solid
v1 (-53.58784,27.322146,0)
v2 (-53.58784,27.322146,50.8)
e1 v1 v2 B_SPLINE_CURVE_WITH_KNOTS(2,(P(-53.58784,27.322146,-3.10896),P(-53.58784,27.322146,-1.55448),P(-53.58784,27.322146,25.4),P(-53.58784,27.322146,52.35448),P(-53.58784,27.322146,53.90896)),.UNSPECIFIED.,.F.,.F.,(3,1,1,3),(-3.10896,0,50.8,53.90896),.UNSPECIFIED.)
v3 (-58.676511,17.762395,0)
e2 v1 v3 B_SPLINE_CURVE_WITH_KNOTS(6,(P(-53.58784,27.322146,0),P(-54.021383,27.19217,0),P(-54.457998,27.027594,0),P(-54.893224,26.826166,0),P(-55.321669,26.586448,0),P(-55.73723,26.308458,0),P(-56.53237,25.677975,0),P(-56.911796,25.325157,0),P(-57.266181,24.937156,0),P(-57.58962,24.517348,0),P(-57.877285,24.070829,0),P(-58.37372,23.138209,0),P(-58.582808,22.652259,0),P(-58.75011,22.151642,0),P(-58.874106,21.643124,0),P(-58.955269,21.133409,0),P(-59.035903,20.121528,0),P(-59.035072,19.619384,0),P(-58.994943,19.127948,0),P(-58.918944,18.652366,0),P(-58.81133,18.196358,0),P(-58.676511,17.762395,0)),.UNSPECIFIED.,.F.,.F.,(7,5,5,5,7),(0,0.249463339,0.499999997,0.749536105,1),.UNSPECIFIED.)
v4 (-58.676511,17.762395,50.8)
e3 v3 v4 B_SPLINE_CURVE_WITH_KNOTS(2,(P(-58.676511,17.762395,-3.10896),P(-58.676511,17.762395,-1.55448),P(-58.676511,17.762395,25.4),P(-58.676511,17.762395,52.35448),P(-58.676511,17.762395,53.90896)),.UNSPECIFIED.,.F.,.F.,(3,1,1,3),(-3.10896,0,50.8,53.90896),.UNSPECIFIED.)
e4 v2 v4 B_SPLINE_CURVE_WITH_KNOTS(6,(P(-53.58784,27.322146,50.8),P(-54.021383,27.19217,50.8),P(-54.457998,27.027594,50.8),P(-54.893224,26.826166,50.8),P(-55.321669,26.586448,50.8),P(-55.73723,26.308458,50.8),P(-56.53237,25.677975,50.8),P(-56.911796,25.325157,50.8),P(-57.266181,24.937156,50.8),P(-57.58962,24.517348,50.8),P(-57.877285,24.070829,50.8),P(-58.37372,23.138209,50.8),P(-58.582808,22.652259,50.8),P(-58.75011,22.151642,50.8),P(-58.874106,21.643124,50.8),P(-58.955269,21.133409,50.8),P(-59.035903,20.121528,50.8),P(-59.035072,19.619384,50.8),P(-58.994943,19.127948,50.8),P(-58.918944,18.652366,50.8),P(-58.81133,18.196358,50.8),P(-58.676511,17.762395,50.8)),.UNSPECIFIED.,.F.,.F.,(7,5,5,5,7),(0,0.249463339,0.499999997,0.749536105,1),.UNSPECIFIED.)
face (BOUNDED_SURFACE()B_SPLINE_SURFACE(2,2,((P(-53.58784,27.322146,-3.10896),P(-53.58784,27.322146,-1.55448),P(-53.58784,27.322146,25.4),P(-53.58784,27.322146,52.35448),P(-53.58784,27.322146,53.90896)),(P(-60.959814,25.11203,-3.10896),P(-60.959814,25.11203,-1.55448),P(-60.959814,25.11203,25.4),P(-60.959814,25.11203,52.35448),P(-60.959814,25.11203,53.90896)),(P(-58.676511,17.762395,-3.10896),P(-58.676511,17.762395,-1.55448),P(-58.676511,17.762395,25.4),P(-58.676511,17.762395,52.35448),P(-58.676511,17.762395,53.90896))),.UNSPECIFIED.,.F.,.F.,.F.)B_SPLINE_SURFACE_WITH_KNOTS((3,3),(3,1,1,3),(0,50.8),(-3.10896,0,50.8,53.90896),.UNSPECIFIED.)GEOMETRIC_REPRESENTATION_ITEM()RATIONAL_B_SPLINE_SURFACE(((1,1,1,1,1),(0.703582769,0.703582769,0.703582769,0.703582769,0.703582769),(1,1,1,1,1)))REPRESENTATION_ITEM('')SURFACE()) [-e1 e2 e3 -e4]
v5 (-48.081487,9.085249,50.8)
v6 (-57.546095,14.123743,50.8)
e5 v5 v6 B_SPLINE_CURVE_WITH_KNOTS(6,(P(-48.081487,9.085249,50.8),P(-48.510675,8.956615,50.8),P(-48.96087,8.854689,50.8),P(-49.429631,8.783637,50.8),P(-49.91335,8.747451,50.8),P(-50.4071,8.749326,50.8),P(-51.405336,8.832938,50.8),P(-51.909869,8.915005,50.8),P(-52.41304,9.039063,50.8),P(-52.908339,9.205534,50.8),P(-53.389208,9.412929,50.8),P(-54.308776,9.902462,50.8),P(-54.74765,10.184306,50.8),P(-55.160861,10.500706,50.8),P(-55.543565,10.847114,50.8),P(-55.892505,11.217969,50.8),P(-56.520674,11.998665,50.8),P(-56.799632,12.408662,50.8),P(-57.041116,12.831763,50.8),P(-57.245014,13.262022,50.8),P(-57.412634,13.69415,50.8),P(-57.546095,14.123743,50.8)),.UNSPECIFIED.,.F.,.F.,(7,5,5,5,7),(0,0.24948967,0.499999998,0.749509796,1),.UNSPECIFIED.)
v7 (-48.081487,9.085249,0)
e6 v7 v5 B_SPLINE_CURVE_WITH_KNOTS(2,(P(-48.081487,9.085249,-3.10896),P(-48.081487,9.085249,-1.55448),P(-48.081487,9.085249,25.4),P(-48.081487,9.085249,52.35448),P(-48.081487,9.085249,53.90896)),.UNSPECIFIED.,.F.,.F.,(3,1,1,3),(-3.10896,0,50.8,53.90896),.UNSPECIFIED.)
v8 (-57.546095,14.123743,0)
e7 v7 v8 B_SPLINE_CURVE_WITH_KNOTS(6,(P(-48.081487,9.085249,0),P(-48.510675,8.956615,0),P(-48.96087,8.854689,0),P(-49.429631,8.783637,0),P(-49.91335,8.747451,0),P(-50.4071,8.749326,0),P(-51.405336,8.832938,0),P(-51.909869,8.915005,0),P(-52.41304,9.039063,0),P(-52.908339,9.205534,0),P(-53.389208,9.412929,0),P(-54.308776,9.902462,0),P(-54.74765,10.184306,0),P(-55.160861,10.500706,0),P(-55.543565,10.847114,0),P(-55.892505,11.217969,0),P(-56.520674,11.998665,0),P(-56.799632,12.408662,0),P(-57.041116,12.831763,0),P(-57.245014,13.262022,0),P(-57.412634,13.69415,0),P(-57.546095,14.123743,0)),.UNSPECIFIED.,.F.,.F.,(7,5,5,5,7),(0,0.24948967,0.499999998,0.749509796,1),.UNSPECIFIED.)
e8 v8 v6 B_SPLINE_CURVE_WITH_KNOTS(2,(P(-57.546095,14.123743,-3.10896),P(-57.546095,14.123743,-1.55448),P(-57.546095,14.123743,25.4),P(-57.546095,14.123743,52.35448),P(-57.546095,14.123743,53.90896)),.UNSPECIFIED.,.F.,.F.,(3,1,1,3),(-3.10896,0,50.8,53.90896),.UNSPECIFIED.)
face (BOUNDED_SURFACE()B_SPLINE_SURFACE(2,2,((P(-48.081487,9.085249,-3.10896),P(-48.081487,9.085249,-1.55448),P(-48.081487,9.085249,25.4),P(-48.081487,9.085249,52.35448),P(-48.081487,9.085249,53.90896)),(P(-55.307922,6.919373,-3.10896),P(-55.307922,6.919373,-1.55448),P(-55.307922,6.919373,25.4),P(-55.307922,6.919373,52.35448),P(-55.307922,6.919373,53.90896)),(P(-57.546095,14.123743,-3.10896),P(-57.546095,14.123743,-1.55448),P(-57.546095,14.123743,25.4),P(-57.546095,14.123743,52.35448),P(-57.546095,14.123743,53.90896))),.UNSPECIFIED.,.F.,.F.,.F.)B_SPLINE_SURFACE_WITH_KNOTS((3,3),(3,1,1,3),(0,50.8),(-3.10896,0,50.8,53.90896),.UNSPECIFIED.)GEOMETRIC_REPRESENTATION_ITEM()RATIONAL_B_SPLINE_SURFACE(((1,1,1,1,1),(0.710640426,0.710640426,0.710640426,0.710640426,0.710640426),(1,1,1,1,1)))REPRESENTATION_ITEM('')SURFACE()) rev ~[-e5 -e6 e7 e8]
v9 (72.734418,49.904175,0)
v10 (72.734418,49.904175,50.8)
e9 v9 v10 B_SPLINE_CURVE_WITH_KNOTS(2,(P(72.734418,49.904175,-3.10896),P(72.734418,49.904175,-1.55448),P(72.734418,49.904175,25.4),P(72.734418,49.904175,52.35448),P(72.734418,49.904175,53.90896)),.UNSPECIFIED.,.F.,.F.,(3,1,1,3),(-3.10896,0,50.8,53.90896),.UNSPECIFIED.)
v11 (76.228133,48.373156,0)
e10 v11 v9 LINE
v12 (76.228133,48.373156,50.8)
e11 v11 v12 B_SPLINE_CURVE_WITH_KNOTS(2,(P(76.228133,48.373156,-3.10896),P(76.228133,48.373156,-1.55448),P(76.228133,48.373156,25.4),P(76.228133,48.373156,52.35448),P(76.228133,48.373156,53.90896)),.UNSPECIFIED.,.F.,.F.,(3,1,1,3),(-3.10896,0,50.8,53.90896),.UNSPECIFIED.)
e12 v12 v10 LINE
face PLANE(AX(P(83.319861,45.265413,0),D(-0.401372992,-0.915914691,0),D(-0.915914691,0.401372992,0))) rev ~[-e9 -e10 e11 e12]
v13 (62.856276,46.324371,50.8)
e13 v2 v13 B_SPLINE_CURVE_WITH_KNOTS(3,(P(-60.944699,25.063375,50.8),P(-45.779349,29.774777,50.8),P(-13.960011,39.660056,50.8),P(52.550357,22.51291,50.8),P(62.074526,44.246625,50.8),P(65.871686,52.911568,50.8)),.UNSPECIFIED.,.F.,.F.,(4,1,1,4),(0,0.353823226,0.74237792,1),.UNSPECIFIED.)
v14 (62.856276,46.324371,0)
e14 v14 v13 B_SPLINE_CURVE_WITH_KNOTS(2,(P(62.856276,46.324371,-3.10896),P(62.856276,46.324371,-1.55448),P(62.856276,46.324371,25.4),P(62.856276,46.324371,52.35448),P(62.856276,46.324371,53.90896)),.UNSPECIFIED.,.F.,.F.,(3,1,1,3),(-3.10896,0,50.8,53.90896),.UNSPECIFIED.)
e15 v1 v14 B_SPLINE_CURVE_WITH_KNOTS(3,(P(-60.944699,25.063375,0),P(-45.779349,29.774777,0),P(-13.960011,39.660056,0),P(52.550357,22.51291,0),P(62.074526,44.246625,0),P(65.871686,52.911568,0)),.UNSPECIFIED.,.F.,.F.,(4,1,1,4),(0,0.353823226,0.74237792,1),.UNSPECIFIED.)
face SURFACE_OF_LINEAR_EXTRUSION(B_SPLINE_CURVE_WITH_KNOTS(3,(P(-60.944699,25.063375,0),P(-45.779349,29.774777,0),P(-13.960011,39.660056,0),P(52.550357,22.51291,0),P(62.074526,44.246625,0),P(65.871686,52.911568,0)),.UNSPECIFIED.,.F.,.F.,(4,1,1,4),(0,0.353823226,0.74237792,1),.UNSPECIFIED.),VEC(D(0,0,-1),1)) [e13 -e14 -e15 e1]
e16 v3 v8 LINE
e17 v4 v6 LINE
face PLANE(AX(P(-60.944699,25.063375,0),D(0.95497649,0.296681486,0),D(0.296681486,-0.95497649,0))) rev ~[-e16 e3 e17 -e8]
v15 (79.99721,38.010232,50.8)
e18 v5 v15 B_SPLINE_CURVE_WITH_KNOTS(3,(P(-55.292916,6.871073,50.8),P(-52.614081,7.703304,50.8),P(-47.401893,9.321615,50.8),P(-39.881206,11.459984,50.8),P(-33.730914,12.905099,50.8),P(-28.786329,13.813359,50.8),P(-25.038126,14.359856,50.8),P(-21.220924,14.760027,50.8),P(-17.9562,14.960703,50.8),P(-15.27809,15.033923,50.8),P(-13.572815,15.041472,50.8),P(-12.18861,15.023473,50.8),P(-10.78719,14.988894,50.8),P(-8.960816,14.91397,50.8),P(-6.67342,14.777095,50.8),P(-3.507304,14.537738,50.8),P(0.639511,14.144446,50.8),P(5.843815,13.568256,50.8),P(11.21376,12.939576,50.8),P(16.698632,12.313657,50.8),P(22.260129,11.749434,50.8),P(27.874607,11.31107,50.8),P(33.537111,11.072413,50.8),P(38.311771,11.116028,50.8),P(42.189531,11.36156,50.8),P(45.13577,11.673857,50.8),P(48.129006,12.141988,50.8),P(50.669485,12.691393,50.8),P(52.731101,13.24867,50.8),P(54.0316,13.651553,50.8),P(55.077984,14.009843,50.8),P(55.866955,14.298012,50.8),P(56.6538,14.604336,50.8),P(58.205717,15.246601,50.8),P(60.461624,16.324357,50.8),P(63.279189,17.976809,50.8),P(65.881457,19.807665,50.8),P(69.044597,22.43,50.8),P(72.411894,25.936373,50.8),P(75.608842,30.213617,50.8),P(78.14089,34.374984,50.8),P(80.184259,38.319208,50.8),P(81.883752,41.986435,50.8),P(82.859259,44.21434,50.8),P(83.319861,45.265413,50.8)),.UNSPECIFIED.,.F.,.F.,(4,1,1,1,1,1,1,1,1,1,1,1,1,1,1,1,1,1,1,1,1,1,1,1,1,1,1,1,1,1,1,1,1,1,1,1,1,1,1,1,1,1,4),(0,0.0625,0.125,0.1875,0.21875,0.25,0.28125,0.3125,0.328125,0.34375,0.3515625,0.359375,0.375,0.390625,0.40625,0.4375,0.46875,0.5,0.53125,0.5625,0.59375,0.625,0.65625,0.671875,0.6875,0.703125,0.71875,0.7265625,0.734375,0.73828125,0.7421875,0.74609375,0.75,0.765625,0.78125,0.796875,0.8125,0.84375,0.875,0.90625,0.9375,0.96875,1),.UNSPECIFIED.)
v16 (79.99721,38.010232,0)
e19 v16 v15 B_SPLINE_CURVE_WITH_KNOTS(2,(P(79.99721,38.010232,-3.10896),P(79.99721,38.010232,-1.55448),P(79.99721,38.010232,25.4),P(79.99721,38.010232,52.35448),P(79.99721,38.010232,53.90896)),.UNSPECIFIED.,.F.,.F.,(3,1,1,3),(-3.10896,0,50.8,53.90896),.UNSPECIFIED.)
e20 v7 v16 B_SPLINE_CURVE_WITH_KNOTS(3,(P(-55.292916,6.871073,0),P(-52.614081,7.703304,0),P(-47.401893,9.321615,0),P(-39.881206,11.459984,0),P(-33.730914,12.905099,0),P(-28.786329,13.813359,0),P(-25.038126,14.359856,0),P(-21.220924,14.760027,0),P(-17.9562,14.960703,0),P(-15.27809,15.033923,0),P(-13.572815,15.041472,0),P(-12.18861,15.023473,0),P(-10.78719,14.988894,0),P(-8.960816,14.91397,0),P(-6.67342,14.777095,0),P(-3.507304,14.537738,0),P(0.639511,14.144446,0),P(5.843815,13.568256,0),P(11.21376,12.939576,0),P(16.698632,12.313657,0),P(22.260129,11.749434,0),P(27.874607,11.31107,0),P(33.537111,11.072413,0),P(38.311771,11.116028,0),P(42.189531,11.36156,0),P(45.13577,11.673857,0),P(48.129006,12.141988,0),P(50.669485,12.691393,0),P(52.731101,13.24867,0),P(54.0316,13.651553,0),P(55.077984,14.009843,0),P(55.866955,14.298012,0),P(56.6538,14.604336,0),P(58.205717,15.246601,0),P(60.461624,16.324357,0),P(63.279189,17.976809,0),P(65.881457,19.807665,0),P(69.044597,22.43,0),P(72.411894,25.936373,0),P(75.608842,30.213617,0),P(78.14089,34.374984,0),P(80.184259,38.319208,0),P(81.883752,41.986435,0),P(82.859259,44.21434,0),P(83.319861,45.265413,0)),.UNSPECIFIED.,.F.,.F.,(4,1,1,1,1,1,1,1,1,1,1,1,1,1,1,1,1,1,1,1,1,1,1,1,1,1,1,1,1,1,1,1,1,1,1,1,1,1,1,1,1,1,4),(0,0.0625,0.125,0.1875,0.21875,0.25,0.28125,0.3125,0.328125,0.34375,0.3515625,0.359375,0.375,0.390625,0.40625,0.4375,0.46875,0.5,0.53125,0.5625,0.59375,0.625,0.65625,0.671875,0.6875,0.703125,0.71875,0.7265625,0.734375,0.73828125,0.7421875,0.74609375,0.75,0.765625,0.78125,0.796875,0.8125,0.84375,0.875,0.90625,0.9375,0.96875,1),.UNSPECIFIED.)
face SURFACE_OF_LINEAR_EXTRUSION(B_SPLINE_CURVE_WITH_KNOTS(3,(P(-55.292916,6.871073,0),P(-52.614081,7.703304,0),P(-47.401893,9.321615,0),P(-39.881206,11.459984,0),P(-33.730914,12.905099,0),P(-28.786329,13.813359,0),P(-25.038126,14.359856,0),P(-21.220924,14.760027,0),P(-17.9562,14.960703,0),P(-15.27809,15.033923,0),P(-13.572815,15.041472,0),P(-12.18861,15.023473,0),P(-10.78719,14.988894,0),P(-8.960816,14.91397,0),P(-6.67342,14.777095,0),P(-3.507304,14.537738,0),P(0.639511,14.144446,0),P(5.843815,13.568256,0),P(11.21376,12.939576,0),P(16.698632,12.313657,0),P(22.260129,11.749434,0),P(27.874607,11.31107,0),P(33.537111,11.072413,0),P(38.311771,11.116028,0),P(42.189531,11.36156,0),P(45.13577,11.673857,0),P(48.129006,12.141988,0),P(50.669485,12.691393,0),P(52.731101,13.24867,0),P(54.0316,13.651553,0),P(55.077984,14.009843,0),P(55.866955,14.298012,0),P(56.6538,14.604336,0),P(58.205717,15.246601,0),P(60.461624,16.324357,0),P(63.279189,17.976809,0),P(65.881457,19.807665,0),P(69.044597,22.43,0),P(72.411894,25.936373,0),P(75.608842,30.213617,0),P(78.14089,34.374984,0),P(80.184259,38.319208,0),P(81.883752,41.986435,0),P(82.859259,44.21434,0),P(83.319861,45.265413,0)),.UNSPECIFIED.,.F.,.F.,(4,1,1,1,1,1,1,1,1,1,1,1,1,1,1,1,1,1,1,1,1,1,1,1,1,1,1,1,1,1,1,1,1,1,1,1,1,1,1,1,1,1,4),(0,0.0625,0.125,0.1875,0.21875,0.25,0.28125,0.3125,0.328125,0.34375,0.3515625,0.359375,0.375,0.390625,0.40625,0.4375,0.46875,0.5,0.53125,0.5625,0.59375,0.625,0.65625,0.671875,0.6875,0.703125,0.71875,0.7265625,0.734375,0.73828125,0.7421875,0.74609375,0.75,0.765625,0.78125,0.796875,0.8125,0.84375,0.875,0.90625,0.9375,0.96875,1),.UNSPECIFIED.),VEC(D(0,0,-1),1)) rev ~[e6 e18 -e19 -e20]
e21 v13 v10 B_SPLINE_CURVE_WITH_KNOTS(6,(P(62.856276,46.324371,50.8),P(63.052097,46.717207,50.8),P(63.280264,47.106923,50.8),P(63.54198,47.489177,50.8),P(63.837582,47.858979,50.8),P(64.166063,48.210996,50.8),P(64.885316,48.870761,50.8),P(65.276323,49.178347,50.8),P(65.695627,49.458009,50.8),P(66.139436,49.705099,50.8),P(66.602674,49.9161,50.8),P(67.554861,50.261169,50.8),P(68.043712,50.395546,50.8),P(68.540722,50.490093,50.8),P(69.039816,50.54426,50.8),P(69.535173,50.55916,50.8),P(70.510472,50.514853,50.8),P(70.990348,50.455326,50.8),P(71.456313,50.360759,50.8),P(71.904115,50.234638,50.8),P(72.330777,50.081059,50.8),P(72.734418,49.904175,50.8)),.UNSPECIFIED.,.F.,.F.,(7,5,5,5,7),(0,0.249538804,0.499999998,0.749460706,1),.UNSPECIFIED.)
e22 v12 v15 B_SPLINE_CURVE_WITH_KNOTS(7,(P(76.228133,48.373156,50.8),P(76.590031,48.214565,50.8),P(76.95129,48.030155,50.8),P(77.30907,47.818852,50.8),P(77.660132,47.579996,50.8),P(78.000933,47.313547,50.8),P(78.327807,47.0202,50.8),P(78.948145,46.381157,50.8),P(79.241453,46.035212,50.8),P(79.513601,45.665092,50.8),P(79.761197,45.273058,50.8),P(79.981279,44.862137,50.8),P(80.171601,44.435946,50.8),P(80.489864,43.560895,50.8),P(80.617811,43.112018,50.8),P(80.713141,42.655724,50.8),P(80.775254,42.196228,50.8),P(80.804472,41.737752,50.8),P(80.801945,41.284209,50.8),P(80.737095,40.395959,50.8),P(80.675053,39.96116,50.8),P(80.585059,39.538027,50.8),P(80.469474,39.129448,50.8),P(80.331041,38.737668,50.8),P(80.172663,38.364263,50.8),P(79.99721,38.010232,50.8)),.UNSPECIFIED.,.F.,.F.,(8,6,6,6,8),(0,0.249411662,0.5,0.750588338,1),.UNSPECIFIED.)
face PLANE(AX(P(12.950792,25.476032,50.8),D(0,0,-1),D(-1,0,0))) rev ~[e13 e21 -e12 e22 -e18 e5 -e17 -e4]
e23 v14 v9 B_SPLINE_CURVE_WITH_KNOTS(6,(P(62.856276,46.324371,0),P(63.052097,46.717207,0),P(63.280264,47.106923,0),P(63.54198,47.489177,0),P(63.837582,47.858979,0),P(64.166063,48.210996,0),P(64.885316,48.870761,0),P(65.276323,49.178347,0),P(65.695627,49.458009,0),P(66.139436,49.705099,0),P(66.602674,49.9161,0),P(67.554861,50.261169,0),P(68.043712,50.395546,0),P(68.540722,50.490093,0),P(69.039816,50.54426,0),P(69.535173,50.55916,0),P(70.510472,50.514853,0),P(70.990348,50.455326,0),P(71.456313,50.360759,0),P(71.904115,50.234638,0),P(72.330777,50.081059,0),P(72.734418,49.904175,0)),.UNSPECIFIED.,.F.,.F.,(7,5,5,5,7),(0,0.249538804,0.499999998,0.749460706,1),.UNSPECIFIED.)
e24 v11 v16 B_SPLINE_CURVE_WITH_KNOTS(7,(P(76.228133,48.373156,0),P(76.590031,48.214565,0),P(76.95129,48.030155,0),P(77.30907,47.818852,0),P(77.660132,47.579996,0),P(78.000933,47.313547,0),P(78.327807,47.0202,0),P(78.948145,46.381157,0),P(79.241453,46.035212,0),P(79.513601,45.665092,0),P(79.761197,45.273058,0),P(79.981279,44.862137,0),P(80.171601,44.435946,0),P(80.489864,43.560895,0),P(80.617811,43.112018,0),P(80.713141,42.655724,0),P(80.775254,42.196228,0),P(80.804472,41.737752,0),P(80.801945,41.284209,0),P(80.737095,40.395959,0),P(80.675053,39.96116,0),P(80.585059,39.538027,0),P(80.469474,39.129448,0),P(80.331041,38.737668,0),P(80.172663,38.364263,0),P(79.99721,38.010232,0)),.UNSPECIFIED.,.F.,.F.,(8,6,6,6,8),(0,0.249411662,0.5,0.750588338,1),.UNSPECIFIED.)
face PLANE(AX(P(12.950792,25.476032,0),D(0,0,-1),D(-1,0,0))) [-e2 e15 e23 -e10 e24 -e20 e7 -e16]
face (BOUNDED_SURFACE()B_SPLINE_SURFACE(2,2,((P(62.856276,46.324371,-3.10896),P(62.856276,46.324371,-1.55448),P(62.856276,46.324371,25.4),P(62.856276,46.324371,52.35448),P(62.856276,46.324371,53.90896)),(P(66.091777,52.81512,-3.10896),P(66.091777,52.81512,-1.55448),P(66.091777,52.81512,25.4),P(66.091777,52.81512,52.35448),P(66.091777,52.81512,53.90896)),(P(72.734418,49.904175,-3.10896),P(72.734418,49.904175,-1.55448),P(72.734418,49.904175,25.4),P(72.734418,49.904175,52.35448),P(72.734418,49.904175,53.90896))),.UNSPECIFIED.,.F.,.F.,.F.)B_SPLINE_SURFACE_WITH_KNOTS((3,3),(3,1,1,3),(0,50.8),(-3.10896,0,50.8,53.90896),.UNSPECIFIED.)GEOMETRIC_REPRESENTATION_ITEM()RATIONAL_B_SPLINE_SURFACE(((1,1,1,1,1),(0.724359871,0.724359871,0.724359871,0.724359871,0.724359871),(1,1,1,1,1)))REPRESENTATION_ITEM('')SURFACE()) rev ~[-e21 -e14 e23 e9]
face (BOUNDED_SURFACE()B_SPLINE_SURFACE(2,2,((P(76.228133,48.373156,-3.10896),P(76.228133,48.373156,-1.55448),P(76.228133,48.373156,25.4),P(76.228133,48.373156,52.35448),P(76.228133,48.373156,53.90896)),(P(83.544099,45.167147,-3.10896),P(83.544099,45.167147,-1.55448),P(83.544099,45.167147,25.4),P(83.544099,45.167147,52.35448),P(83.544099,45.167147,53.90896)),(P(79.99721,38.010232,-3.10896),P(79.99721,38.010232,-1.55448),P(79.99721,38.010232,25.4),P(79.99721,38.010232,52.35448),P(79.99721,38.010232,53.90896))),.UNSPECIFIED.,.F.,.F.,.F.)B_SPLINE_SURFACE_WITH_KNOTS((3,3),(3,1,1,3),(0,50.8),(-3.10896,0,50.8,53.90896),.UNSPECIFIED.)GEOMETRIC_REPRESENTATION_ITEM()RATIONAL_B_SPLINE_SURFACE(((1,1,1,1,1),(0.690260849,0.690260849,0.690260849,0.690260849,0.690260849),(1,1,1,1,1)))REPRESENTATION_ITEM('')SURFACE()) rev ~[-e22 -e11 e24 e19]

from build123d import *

# Parameters (mm, degrees)
F1_DEPTH = 50.8
F2_R     = 7.62


# Not quite as in the source:
# - the dataset's text gives a spline's control points without its knots; the knots are read off the source's solid


with BuildPart() as f1:
    # F0 (on Top) → F1 (new body)
    with BuildSketch(Plane.XY):
        with BuildLine():
            add(Edge.make_bspline(
                [(-60.944698751, 25.0633750111), (-45.7793490355, 29.7747773681), (-13.9600111377, 39.6600557418), (52.5503573555, 22.5129103077), (62.0745263261, 44.2466254476), (65.8716857433, 52.911568433)],
                knots=[0, 0, 0, 0, 0.3538232256, 0.7423779196, 1, 1, 1, 1], degree=3))
            Line((-60.944698751, 25.0633750111), (-55.2929164482, 6.8710728807))
            add(Edge.make_bspline(
                [(-55.2929164482, 6.8710728807), (-52.6140805534, 7.7033038537), (-47.4018926145, 9.3216145558), (-39.8812064113, 11.4599835905), (-33.7309143498, 12.9050992109), (-28.786328872, 13.8133593735), (-25.0381264341, 14.3598557381), (-21.2209235546, 14.7600271905), (-17.9562000554, 14.9607026798), (-15.2780901655, 15.0339227144), (-13.5728145637, 15.0414720085), (-12.1886095674, 15.0234734602), (-10.7871900479, 14.9888942675), (-8.9608161671, 14.9139701297), (-6.6734196362, 14.777094689), (-3.5073038309, 14.5377383447), (0.6395111781, 14.1444456971), (5.8438148043, 13.5682562387), (11.2137603043, 12.9395763815), (16.6986316777, 12.3136570181), (22.2601288935, 11.7494341891), (27.874607408, 11.3110698362), (33.5371111559, 11.0724127396), (38.3117706057, 11.1160284257), (42.1895309058, 11.3615597133), (45.1357695567, 11.6738573232), (48.129006294, 12.141988219), (50.6694852802, 12.6913928111), (52.7311013888, 13.2486701903), (54.0315996583, 13.6515527053), (55.0779843338, 14.009843186), (55.8669552145, 14.298012218), (56.6538003886, 14.6043360697), (58.2057168856, 15.2466006567), (60.4616240485, 16.3243567042), (63.2791892362, 17.9768086998), (65.881457239, 19.8076647102), (69.0445974475, 22.4299995717), (72.4118941025, 25.9363734821), (75.608842099, 30.2136170314), (78.1408898176, 34.3749839674), (80.1842586198, 38.3192081065), (81.8837517412, 41.9864350032), (82.8592586587, 44.2143404913), (83.3198606056, 45.26541293)],
                knots=[0, 0, 0, 0, 0.0625, 0.125, 0.1875, 0.21875, 0.25, 0.28125, 0.3125, 0.328125, 0.34375, 0.3515625, 0.359375, 0.375, 0.390625, 0.40625, 0.4375, 0.46875, 0.5, 0.53125, 0.5625, 0.59375, 0.625, 0.65625, 0.671875, 0.6875, 0.703125, 0.71875, 0.7265625, 0.734375, 0.73828125, 0.7421875, 0.74609375, 0.75, 0.765625, 0.78125, 0.796875, 0.8125, 0.84375, 0.875, 0.90625, 0.9375, 0.96875, 1, 1, 1, 1], degree=3))
            Line((83.3198606056, 45.26541293), (65.8716857433, 52.911568433))
        make_face()
    extrude(amount=F1_DEPTH)

    # F2
    f2_edges = [f1.edges().sort_by_distance(p)[0] for p in [
        (65.871686, 52.911568, 25.4),
        (83.319861, 45.265413, 25.4),
        (-60.944699, 25.063375, 25.4),
        (-55.292916, 6.871073, 25.4),
    ]]
    fillet(f2_edges, radius=F2_R)


solid = f1.part
